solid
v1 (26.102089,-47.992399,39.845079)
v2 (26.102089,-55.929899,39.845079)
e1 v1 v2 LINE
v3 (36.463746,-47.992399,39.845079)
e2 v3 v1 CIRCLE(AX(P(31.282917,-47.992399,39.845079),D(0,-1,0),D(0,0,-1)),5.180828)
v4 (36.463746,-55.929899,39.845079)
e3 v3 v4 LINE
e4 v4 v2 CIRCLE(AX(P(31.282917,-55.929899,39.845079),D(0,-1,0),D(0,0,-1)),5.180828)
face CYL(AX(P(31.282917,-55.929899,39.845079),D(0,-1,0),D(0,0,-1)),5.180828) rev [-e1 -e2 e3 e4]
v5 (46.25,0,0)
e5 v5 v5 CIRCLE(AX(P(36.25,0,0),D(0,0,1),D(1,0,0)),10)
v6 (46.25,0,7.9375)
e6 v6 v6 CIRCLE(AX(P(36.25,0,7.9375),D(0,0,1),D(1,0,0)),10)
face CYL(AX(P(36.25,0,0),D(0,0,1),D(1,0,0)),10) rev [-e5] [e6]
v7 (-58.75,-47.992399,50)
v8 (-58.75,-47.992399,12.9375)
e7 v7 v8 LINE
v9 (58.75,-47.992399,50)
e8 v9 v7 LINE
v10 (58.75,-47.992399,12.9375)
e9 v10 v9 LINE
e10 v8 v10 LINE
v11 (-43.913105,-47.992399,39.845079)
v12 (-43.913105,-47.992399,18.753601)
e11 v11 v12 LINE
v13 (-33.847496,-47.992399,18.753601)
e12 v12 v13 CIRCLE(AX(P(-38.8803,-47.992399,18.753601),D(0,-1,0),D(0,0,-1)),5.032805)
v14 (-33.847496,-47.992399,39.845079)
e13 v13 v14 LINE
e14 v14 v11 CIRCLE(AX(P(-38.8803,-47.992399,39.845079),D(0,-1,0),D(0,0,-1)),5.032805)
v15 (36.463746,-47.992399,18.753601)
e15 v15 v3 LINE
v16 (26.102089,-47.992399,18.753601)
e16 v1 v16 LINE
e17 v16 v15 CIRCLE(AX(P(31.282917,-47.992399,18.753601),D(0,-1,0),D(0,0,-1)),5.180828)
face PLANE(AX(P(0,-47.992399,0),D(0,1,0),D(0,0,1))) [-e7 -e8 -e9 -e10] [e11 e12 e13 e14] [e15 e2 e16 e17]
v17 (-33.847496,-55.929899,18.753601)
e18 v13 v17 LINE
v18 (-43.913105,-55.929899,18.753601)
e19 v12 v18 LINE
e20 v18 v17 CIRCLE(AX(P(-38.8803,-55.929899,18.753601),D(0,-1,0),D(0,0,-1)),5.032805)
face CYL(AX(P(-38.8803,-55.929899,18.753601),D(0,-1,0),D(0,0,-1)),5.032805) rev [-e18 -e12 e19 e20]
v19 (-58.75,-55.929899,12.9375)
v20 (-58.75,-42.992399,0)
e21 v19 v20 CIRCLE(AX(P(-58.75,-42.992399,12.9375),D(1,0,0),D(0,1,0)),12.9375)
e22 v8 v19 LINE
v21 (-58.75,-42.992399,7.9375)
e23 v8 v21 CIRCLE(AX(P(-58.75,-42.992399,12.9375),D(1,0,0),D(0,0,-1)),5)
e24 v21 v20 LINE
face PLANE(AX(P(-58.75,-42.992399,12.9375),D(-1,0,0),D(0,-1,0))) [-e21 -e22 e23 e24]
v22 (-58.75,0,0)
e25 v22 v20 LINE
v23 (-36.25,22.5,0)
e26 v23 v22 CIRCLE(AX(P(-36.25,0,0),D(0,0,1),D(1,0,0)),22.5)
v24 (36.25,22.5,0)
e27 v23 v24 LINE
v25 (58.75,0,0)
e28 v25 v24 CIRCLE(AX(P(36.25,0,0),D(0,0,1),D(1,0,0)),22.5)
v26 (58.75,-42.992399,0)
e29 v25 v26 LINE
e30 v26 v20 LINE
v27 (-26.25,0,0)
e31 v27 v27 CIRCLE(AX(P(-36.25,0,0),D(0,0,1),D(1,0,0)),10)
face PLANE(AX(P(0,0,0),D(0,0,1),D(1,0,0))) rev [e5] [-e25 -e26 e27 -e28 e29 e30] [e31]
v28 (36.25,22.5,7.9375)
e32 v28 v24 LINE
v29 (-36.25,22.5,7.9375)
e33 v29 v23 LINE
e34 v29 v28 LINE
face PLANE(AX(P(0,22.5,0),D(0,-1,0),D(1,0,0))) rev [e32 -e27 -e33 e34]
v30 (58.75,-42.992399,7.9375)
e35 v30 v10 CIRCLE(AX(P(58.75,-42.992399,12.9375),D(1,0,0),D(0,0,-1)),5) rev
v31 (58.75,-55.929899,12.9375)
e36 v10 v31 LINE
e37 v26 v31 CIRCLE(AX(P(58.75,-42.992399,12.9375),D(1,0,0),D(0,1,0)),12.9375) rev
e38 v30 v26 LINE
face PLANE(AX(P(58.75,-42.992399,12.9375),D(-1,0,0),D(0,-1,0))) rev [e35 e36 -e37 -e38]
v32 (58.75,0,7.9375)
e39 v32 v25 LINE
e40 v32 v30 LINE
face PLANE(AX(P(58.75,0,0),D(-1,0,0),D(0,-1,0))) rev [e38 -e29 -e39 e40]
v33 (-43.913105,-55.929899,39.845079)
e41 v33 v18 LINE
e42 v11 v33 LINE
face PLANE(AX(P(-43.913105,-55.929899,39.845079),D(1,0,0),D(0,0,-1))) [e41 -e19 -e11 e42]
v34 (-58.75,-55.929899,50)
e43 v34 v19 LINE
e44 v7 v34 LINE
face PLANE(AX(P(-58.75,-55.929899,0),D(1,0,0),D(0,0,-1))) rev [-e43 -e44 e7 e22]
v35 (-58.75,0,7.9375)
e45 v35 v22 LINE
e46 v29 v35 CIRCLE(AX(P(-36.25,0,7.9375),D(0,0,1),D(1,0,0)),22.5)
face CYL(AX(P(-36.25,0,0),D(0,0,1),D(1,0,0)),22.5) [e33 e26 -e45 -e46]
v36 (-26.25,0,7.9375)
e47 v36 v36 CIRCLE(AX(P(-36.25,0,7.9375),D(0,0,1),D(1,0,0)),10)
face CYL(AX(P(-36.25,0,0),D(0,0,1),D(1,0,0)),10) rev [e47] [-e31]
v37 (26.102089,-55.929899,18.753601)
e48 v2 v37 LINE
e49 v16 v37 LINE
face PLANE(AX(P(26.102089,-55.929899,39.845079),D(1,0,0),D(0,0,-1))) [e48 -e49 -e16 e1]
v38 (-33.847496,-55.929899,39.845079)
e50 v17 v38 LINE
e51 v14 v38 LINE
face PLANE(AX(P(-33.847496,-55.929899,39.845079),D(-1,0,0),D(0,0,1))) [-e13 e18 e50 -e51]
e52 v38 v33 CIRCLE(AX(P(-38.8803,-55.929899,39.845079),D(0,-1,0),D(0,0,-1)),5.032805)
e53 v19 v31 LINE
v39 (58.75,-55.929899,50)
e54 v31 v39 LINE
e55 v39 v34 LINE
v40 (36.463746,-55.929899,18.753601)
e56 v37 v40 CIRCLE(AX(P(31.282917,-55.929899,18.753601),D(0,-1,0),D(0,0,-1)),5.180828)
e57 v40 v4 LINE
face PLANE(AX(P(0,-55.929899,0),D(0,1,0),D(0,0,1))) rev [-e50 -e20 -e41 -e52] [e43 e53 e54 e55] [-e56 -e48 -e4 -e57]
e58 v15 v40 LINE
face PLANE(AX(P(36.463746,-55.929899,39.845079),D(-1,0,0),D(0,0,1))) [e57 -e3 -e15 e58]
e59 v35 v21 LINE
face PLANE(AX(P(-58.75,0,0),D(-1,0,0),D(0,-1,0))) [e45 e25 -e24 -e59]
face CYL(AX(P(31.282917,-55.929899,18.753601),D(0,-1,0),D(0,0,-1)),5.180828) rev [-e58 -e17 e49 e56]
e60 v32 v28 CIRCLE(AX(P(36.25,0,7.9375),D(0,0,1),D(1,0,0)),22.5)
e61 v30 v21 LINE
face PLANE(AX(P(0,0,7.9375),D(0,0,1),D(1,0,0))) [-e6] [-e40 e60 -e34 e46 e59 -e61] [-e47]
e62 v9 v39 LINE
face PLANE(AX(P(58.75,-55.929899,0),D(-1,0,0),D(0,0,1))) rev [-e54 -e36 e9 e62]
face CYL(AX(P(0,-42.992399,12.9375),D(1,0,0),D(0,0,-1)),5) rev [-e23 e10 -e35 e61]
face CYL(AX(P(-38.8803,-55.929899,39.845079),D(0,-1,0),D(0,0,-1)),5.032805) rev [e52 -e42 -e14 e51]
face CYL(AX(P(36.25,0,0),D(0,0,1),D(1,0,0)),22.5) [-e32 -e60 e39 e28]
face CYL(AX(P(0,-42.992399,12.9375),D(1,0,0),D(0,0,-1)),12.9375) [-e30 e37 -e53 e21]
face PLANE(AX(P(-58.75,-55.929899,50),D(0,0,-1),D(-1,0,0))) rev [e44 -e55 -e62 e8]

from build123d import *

# Parameters (mm, degrees)
CROQUIS1_R                = 10
SALIENTE_EXTRUIR1_DEPTH   = 7.9375
CROQUIS3_W                = 117.5
CROQUIS3_H                = 50
SALIENTE_EXTRUIR2_DEPTH   = 7.9375
CONVERTIR_S_LIDO1_START   = -58.75
CONVERTIR_S_LIDO1_DEPTH   = 117.5
CONVERTIR_S_LIDO1_2_DEPTH = 117.5


# Read off the part's stored shape, not the designer's step: Convertir-Sólido1
with BuildPart() as part:
    # Croquis1 → Saliente-Extruir1 (new body)
    with BuildSketch(Plane.XY):
        with BuildLine():
            ThreePointArc((58.75, 0), (52.159902577, 15.909902577), (36.25, 22.5))
            Line((36.25, 22.5), (-36.25, 22.5))
            ThreePointArc((-36.25, 22.5), (-52.159902577, 15.909902577), (-58.75, 0))
            Line((-58.75, 0), (-58.75, -47.992399286))
            Line((-58.75, -47.992399286), (58.75, -47.992399286))
            Line((58.75, -47.992399286), (58.75, 0))
        make_face()
        with Locations((-36.25, 0)):
            Circle(CROQUIS1_R, mode=Mode.SUBTRACT)
        with Locations((36.25, 0)):
            Circle(CROQUIS1_R, mode=Mode.SUBTRACT)
    extrude(amount=SALIENTE_EXTRUIR1_DEPTH)

    # Croquis3 → Saliente-Extruir2 (add)
    with BuildSketch(Plane.XZ.offset(47.992399286)):
        with Locations((0, 25)):
            Rectangle(CROQUIS3_W, CROQUIS3_H)
        with BuildLine():
            Line((-33.847495585, 39.845079108), (-33.847495585, 18.753600712))
            ThreePointArc((-33.847495585, 18.753600712), (-38.88030023, 13.720796067), (-43.913104875, 18.753600712))
            Line((-43.913104875, 18.753600712), (-43.913104875, 39.845079108))
            ThreePointArc((-43.913104875, 39.845079108), (-38.88030023, 44.877883753), (-33.847495585, 39.845079108))
        make_face(mode=Mode.SUBTRACT)
        with BuildLine():
            Line((36.463745774, 39.845079108), (36.463745774, 18.753600712))
            ThreePointArc((36.463745774, 18.753600712), (31.282917463, 13.572772401), (26.102089152, 18.753600712))
            Line((26.102089152, 18.753600712), (26.102089152, 39.845079108))
            ThreePointArc((26.102089152, 39.845079108), (31.282917463, 45.025907419), (36.463745774, 39.845079108))
        make_face(mode=Mode.SUBTRACT)
    extrude(amount=SALIENTE_EXTRUIR2_DEPTH)

    # Convertir-Sólido1 outline → Convertir-Sólido1 (cut)
    with BuildSketch(Plane.YZ.offset(CONVERTIR_S_LIDO1_START)):
        with BuildLine():
            ThreePointArc((-42.992399286, 0), (-52.140593268, 3.789306019), (-55.929899286, 12.9375))
            Line((-55.929899286, 12.9375), (-55.929899286, 0))
            Line((-55.929899286, 0), (-42.992399286, 0))
        make_face()
    extrude(amount=CONVERTIR_S_LIDO1_DEPTH, mode=Mode.SUBTRACT)

    # Convertir-S_lido1 2 outline → Convertir-S_lido1 2 (add)
    with BuildSketch(Plane.YZ.offset(CONVERTIR_S_LIDO1_START)):
        with BuildLine():
            ThreePointArc((-42.992399286, 7.9375), (-46.527933192, 9.401966094), (-47.992399286, 12.9375))
            Line((-47.992399286, 12.9375), (-47.992399286, 7.9375))
            Line((-47.992399286, 7.9375), (-42.992399286, 7.9375))
        make_face()
    extrude(amount=CONVERTIR_S_LIDO1_2_DEPTH)


solid = part.part
